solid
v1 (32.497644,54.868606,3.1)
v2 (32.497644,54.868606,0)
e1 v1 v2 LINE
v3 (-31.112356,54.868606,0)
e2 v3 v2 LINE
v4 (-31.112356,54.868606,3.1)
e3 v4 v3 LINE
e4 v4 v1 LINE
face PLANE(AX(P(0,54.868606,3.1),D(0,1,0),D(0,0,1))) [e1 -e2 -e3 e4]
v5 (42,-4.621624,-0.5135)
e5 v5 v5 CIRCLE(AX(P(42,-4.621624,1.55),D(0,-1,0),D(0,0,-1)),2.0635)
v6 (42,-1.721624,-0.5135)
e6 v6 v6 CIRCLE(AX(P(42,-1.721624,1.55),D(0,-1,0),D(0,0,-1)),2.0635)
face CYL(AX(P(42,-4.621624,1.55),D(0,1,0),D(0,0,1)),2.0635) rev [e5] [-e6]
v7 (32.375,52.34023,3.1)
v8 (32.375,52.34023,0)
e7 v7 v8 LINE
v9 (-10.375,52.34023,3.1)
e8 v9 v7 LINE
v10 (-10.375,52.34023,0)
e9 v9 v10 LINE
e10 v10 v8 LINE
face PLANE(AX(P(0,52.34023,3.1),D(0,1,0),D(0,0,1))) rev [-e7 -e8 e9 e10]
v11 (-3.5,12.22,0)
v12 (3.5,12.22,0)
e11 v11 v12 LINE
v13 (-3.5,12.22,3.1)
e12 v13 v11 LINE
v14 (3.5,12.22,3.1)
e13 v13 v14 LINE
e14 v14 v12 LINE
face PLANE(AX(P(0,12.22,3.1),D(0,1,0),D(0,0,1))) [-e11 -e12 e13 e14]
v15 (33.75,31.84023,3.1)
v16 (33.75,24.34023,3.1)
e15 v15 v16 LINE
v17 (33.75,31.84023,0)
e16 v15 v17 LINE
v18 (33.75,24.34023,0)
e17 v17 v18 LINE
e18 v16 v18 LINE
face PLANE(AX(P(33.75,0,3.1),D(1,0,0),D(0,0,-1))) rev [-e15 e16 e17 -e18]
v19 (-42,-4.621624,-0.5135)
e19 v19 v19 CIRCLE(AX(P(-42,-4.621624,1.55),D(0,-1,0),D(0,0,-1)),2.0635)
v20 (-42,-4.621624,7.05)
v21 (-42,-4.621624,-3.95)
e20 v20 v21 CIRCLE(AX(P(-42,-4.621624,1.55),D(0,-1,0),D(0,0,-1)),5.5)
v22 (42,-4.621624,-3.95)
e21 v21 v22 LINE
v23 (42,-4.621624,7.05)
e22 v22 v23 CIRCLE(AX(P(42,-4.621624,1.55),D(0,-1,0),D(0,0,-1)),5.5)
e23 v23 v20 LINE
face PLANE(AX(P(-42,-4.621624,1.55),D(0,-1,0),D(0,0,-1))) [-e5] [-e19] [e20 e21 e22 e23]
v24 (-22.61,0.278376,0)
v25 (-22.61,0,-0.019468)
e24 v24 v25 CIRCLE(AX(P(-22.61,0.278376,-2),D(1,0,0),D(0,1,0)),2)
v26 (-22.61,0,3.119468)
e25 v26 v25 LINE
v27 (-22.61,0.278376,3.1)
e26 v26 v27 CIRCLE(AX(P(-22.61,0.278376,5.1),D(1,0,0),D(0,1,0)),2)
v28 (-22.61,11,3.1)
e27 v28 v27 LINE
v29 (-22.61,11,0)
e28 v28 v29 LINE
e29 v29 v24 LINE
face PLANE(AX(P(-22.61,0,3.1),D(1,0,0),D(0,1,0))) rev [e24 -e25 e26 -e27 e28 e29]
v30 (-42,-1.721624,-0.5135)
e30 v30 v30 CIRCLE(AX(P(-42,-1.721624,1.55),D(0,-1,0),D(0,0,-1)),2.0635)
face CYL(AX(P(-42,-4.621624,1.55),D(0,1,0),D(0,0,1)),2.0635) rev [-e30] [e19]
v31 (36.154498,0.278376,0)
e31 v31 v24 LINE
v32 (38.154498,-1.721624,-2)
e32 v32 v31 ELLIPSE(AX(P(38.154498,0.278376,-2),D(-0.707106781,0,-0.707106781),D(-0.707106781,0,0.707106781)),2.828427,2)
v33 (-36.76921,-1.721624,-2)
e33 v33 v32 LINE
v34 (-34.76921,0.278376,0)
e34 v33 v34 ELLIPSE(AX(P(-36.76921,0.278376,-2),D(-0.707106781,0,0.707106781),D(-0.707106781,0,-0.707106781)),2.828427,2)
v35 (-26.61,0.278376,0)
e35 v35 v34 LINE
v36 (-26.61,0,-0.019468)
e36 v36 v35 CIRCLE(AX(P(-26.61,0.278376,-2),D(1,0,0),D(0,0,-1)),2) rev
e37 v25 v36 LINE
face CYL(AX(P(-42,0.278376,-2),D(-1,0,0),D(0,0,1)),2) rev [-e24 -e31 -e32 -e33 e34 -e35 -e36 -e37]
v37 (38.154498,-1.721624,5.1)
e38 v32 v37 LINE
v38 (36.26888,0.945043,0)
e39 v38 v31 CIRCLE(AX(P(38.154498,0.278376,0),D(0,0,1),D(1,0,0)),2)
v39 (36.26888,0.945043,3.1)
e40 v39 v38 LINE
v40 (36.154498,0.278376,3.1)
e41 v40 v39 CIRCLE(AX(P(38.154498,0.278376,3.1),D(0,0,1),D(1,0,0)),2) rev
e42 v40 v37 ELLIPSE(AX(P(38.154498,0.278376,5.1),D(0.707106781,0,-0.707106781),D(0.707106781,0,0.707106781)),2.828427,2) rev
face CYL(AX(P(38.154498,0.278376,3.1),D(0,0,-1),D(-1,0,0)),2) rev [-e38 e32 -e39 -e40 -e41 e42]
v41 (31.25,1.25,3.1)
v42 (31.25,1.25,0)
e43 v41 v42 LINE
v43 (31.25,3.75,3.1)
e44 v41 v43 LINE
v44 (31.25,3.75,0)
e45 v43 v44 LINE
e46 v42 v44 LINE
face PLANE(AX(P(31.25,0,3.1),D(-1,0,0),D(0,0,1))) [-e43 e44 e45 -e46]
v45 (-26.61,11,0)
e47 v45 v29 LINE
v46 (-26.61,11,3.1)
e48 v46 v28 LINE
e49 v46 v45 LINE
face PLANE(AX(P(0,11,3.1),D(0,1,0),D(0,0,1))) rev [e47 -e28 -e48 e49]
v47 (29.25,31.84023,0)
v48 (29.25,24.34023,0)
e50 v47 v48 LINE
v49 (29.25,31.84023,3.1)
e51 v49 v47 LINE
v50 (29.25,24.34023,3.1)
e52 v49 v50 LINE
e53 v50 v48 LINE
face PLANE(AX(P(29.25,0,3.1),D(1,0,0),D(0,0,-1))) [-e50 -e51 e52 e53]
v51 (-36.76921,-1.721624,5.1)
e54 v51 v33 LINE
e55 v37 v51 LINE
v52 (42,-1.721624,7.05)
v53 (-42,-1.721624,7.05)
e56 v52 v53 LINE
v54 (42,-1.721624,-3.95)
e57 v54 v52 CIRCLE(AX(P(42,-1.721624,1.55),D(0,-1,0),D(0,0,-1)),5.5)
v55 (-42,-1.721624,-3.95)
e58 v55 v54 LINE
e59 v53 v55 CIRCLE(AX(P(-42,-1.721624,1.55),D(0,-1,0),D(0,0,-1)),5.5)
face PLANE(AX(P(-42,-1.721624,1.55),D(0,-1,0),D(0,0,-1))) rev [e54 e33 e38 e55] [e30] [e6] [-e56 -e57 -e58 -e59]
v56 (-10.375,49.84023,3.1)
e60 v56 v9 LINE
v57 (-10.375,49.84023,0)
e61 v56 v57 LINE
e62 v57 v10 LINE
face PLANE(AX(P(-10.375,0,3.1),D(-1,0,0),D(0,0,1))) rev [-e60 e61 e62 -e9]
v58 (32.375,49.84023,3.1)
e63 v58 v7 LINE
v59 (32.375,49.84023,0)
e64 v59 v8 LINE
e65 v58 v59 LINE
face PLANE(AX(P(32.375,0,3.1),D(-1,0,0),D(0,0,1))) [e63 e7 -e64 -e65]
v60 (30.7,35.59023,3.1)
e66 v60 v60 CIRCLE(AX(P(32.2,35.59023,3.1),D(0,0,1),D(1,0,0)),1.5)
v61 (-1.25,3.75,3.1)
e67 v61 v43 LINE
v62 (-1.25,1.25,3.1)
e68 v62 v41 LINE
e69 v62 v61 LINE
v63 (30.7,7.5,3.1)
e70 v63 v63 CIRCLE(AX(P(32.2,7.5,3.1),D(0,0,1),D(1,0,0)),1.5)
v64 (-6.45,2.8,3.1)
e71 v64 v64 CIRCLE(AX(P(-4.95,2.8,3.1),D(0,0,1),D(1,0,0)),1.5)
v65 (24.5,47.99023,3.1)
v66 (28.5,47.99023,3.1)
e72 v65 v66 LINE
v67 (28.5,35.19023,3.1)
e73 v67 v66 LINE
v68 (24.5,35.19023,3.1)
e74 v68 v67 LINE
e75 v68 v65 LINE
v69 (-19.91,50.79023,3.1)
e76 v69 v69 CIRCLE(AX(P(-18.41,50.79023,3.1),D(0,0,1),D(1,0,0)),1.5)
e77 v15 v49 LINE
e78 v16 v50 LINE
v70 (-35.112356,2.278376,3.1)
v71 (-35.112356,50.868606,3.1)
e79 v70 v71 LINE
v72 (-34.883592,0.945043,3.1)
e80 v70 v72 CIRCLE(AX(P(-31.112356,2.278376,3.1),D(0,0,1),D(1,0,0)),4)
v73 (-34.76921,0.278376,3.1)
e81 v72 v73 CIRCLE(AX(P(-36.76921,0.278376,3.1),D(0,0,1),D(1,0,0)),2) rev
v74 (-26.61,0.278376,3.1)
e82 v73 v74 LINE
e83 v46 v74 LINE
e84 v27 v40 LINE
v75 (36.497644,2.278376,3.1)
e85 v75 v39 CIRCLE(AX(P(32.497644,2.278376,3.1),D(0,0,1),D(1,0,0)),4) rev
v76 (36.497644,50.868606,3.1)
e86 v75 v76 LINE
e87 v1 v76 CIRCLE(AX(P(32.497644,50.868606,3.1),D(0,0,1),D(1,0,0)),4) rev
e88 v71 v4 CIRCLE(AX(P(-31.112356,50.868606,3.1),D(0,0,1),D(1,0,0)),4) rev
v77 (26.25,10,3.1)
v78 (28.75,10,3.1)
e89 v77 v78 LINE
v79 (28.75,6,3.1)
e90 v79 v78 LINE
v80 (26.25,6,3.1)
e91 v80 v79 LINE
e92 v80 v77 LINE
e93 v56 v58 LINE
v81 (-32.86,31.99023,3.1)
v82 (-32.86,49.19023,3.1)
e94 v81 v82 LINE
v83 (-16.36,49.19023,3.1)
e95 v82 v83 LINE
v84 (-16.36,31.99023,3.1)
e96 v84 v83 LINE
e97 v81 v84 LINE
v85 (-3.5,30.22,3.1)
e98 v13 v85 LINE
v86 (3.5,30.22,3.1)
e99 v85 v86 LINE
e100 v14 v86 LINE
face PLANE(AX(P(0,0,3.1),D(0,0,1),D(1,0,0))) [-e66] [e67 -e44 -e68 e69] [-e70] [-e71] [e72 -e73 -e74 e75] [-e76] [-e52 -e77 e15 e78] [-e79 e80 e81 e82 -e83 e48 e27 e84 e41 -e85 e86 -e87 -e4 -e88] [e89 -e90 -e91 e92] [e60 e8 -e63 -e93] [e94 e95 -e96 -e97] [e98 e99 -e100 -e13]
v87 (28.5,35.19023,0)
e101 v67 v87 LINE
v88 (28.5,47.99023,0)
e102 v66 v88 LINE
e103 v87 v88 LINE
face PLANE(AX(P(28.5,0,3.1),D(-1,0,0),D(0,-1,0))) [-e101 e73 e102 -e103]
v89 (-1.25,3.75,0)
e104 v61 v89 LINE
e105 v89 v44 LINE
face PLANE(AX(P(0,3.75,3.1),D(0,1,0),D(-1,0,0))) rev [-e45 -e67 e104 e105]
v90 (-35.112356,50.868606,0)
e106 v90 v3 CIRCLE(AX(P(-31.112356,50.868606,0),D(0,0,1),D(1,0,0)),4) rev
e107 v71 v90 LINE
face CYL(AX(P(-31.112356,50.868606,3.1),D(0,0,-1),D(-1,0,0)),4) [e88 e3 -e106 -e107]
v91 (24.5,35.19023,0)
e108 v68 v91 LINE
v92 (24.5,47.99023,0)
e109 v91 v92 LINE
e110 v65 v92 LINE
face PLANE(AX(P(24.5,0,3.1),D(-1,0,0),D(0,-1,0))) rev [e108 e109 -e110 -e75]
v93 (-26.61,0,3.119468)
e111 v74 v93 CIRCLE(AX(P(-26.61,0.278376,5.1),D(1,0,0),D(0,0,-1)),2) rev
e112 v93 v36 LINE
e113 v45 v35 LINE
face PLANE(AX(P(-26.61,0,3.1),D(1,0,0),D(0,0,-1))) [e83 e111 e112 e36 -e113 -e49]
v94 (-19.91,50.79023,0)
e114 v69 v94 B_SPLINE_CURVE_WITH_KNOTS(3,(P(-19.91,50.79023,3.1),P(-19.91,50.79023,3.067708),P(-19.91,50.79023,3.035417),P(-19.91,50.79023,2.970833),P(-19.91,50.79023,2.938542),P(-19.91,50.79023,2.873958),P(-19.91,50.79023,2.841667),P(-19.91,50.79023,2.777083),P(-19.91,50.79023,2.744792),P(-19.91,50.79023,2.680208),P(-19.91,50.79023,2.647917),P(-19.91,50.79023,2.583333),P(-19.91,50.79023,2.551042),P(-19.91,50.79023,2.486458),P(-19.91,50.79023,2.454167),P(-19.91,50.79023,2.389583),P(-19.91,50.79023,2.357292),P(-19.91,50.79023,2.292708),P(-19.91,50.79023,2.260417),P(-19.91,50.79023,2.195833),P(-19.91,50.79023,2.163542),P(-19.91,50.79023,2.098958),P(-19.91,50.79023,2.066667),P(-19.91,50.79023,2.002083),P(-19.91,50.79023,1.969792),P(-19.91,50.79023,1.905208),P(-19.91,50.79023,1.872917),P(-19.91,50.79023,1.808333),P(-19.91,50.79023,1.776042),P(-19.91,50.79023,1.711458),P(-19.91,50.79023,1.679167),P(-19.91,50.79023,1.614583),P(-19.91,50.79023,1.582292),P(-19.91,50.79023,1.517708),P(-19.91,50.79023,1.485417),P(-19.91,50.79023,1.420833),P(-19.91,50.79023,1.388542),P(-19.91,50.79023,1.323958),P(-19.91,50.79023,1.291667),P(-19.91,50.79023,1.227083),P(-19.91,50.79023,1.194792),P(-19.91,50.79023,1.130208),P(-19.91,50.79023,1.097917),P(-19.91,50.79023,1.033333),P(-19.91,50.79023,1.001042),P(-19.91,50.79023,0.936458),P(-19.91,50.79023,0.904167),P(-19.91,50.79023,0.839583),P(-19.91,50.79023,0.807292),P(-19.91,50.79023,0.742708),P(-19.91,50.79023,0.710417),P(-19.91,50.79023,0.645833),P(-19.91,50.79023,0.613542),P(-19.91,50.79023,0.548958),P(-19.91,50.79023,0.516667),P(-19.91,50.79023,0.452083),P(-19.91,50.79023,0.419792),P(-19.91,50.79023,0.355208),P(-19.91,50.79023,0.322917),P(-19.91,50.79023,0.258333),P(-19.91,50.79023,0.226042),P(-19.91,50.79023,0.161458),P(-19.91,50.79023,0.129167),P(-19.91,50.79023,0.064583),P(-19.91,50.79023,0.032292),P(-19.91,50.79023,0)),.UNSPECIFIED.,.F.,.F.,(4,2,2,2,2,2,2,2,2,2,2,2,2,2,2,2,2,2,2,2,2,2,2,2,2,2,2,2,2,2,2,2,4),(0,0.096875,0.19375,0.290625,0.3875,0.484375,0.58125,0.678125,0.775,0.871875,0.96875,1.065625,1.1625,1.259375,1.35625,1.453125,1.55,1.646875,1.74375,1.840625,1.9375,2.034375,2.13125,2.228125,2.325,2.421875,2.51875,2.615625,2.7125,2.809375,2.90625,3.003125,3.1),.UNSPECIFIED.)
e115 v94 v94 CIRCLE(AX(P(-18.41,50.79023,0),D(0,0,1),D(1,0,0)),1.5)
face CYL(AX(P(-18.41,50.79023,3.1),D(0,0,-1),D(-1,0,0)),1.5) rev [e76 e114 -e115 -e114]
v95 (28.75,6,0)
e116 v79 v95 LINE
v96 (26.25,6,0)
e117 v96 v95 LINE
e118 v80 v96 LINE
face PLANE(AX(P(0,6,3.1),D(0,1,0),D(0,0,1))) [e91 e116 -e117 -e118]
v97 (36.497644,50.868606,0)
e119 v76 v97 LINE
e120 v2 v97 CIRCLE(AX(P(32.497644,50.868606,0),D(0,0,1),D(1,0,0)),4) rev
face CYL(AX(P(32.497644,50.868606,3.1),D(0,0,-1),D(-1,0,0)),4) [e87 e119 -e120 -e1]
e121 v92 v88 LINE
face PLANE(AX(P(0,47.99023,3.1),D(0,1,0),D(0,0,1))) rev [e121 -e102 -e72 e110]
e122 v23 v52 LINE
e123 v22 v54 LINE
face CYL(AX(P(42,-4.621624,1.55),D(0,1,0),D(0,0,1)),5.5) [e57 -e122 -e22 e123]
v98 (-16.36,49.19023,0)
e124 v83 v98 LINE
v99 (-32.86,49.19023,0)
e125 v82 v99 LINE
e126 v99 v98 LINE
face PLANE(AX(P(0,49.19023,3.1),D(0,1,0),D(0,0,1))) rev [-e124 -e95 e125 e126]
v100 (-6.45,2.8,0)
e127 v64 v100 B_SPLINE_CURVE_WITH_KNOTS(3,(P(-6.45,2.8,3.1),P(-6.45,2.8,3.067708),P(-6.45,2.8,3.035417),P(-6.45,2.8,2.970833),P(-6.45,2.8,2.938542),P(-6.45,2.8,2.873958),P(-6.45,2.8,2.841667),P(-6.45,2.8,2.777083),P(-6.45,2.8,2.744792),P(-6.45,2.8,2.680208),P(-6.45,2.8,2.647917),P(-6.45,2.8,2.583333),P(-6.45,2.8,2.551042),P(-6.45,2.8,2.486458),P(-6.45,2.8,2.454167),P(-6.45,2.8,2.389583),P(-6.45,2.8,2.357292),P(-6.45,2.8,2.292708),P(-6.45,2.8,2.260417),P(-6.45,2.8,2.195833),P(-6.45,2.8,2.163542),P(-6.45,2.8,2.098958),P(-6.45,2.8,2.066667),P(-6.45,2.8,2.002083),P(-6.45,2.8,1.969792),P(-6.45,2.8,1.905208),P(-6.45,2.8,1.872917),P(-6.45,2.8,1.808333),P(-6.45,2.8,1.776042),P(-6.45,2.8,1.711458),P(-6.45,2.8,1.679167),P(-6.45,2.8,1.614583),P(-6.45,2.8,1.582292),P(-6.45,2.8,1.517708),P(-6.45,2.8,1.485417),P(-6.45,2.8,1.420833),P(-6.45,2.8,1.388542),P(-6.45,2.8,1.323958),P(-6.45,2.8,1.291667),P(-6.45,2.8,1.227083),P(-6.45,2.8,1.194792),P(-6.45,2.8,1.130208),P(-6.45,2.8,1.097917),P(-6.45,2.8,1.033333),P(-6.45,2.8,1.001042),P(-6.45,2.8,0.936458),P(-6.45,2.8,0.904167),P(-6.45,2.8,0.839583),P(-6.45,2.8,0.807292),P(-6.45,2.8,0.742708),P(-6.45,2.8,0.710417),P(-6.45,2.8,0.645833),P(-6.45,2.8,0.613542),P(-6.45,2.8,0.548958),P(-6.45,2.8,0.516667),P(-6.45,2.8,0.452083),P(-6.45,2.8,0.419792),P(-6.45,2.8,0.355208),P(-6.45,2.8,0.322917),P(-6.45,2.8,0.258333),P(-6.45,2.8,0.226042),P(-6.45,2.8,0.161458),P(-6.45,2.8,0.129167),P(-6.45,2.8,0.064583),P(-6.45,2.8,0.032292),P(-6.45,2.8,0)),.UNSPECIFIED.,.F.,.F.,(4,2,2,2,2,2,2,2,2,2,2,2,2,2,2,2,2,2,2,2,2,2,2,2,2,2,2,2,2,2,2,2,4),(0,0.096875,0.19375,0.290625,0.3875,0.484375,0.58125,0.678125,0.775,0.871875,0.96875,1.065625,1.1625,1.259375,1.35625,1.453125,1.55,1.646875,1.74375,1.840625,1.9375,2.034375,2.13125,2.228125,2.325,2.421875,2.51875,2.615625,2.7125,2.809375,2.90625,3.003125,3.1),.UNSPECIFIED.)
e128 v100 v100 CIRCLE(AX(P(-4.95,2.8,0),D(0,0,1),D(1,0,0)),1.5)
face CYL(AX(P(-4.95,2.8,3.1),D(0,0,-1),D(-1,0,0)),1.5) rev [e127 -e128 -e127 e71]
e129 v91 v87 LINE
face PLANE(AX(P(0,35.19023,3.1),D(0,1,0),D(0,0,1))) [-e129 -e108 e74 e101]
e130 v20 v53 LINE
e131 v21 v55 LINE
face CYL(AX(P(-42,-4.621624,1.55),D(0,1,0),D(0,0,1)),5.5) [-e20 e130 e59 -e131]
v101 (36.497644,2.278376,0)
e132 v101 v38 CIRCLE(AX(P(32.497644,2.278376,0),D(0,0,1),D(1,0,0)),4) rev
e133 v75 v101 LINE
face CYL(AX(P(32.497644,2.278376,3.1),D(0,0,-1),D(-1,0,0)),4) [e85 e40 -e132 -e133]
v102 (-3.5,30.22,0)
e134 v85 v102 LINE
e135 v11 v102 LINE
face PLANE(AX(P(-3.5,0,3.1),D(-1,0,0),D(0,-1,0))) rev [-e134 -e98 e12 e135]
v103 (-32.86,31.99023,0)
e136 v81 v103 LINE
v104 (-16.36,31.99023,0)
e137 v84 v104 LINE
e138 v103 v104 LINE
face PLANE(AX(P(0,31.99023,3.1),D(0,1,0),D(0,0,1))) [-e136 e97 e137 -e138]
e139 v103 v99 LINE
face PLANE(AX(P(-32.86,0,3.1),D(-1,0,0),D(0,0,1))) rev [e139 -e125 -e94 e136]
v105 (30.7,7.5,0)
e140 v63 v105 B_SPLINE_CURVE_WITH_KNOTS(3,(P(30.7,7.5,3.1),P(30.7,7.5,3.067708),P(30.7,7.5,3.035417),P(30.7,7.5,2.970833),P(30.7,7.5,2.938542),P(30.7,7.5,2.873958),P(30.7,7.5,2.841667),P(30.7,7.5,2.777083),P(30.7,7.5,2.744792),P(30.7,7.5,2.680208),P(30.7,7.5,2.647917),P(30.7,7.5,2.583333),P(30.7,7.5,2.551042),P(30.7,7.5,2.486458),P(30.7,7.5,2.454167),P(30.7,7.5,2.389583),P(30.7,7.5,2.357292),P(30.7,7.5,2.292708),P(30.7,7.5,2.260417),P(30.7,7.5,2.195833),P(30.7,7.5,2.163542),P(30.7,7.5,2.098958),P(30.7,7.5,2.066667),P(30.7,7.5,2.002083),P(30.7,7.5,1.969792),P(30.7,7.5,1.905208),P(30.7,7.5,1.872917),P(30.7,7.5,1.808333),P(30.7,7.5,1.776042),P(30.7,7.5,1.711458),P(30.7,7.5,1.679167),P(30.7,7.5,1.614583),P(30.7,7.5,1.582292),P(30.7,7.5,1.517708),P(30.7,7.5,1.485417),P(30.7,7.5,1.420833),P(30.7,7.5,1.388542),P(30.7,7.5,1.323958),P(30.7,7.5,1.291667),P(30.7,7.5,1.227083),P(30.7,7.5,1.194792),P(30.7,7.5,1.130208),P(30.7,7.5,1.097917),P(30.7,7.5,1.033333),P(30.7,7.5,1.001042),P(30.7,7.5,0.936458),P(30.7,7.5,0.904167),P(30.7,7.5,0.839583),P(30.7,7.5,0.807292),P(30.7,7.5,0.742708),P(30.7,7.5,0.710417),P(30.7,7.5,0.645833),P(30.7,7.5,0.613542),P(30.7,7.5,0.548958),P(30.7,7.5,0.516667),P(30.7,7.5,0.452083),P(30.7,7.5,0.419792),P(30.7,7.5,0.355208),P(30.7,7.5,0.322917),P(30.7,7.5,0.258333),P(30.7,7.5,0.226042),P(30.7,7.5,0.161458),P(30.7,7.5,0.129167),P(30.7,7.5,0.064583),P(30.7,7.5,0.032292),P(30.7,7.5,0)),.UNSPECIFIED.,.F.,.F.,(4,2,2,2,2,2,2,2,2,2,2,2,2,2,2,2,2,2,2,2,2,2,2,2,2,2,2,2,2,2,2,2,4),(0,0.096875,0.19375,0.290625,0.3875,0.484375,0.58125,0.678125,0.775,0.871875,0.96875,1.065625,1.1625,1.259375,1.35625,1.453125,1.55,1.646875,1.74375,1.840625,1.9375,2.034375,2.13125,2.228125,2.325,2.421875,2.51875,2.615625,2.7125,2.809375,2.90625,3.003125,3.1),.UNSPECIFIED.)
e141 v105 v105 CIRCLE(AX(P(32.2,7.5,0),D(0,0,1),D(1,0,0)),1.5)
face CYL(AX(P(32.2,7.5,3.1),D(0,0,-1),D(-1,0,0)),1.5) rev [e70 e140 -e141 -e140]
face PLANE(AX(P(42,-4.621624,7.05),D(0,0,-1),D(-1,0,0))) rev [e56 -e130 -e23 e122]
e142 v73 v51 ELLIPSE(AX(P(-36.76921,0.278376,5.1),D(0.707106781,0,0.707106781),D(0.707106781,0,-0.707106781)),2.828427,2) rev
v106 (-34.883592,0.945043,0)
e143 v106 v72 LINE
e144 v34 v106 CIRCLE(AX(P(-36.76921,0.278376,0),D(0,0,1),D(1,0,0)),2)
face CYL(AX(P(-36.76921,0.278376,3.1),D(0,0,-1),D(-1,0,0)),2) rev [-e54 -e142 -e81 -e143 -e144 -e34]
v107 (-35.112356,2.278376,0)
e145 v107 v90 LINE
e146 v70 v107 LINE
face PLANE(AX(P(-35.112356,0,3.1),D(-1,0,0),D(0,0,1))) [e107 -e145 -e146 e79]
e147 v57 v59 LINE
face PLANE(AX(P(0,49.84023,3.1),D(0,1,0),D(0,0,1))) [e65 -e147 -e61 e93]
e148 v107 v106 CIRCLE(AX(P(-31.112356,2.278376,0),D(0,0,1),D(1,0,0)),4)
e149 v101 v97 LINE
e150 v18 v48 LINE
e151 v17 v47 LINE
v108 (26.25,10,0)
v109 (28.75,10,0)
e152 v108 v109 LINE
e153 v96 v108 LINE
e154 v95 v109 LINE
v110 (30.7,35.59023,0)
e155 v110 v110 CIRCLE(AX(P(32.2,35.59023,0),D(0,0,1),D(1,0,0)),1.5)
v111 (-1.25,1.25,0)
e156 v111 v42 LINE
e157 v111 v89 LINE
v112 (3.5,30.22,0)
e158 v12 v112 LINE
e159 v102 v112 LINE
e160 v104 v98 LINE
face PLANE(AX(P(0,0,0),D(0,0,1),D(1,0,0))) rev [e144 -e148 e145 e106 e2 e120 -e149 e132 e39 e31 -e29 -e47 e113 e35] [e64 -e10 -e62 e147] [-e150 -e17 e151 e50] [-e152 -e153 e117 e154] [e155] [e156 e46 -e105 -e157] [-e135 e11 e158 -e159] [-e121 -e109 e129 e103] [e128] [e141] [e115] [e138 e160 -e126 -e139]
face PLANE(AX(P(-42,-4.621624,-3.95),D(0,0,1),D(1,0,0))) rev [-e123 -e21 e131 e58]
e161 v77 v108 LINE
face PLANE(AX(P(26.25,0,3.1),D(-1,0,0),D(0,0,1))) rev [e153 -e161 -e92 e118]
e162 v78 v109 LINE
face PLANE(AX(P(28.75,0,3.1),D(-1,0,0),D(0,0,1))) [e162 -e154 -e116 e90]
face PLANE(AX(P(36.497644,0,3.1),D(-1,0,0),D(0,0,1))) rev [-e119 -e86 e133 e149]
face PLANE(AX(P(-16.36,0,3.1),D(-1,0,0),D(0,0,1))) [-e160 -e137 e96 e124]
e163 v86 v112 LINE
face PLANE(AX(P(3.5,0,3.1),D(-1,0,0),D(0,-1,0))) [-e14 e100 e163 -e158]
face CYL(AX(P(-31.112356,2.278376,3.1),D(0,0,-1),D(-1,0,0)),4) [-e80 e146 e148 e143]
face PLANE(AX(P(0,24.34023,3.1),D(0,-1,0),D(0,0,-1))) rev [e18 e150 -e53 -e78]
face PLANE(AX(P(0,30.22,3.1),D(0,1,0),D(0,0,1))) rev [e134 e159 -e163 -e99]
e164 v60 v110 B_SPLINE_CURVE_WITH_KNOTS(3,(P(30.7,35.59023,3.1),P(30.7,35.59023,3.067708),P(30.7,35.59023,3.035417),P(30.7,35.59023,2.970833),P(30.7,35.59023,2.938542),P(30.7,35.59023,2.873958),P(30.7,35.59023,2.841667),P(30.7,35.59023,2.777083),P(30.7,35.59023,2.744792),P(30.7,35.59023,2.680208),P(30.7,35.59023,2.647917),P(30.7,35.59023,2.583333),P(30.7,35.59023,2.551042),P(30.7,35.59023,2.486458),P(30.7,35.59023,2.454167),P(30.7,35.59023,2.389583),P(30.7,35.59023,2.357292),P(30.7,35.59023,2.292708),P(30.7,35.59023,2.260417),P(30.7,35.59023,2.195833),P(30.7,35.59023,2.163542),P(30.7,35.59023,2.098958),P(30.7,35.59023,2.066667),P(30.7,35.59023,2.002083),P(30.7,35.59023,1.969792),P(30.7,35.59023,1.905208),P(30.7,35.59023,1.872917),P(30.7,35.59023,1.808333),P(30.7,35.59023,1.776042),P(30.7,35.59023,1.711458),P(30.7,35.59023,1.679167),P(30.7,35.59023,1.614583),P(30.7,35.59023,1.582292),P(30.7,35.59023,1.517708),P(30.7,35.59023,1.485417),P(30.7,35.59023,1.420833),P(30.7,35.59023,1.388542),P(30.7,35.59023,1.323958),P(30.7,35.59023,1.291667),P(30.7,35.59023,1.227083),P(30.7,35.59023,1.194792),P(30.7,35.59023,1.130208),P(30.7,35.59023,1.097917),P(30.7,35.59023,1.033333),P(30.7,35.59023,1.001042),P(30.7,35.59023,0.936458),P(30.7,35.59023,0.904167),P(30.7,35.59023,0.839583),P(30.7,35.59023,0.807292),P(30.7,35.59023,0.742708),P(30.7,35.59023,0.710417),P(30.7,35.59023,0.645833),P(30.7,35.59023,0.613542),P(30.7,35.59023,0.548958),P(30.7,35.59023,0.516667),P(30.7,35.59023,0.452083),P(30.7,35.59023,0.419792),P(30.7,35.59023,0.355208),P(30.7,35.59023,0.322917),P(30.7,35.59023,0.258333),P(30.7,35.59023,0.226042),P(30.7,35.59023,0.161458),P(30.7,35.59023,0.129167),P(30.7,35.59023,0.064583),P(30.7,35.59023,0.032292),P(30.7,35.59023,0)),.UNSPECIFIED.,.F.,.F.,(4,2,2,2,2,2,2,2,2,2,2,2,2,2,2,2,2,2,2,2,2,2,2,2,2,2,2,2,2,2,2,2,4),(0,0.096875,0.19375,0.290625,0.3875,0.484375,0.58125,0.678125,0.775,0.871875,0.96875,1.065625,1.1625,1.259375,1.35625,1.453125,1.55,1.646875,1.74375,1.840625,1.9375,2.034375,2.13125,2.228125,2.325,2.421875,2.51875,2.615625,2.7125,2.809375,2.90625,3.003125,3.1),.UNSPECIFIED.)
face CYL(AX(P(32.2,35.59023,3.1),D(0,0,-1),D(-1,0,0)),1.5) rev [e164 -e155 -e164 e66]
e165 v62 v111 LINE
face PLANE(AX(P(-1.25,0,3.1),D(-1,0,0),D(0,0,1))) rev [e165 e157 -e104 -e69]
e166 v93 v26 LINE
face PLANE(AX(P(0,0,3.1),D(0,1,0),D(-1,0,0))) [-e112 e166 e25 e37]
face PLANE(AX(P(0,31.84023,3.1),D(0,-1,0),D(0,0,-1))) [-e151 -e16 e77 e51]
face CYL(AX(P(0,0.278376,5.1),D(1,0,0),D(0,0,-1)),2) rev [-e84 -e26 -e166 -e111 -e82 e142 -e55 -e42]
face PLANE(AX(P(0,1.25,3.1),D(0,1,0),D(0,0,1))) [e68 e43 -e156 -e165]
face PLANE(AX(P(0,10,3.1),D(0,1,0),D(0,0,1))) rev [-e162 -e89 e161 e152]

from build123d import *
from build123d.topology import SkipClean

# Parameters (mm, degrees)
SKETCH1_R           = 1.5
SKETCH1_W           = 16.5
SKETCH1_H           = 17.2
SKETCH1_W_2         = 7
SKETCH1_H_2         = 18
SKETCH1_W_3         = 42.75
SKETCH1_H_3         = 2.5
SKETCH1_W_4         = 4
SKETCH1_H_4         = 12.8
SKETCH1_W_5         = 4.5
SKETCH1_H_5         = 7.5
SKETCH1_W_6         = 2.5
SKETCH1_H_6         = 4
SKETCH1_W_7         = 32.5
SKETCH1_H_7         = 11
BOSS_EXTRUDE1_DEPTH = 3.1
SKETCH2_R           = 2.0635
BOSS_EXTRUDE2_DEPTH = 2.9
FILLET1_DEPTH       = 3.1
FILLET1_START       = -36.769210249
FILLET1_2_DEPTH     = 74.923708499
FILLET1_START_2     = -22.61
FILLET1_3_DEPTH     = 60.0761
FILLET1_START_3     = -36.399689195
FILLET1_4_DEPTH     = 9.789689195
FILLET1_START_4     = -2
FILLET1_5_DEPTH     = 7.1


with BuildPart() as part:
    # Sketch1 → Boss-Extrude1 (new body)
    with BuildSketch(Plane.XY):
        with BuildLine():
            Line((-35.112356, 2.278375887), (-35.112356, 50.868606365))
            ThreePointArc((-35.112356, 50.868606365), (-33.940783125, 53.697033489), (-31.112356, 54.868606365))
            Line((-31.112356, 54.868606365), (32.497644, 54.868606365))
            ThreePointArc((32.497644, 54.868606365), (35.326071125, 53.697033489), (36.497644, 50.868606365))
            Line((36.497644, 50.868606365), (36.497644, 2.278375887))
            ThreePointArc((36.497644, 2.278375887), (35.326071125, -0.550051237), (32.497644, -1.721624113))
            Line((32.497644, -1.721624113), (-31.112356, -1.721624113))
            ThreePointArc((-31.112356, -1.721624113), (-33.940783125, -0.550051237), (-35.112356, 2.278375887))
        make_face()
        with Locations(Location((-18.41, 50.790230477, 0), (0, 0, 180))):
            Circle(SKETCH1_R, mode=Mode.SUBTRACT)
        with Locations(Location((-4.95, 2.8, 0), (0, 0, 180))):
            Circle(SKETCH1_R, mode=Mode.SUBTRACT)
        with Locations(Location((32.2, 7.5, 0), (0, 0, 180))):
            Circle(SKETCH1_R, mode=Mode.SUBTRACT)
        with Locations(Location((32.2, 35.590230477, 0), (0, 0, 180))):
            Circle(SKETCH1_R, mode=Mode.SUBTRACT)
        with Locations((-24.61, 40.590230477)):
            Rectangle(SKETCH1_W, SKETCH1_H, mode=Mode.SUBTRACT)
        with Locations((0, 21.22)):
            Rectangle(SKETCH1_W_2, SKETCH1_H_2, mode=Mode.SUBTRACT)
        with Locations((11, 51.090230477)):
            Rectangle(SKETCH1_W_3, SKETCH1_H_3, mode=Mode.SUBTRACT)
        with Locations((26.5, 41.590230477)):
            Rectangle(SKETCH1_W_4, SKETCH1_H_4, mode=Mode.SUBTRACT)
        with Locations((31.5, 28.090230477)):
            Rectangle(SKETCH1_W_5, SKETCH1_H_5, mode=Mode.SUBTRACT)
        with Locations((27.5, 8)):
            Rectangle(SKETCH1_W_6, SKETCH1_H_6, mode=Mode.SUBTRACT)
        with Locations((15, 2.5)):
            Rectangle(SKETCH1_W_7, SKETCH1_H_3, mode=Mode.SUBTRACT)
        with Locations((-24.61, 5.5)):
            Rectangle(SKETCH1_W_4, SKETCH1_H_7, mode=Mode.SUBTRACT)
    extrude(amount=BOSS_EXTRUDE1_DEPTH)

    # Sketch2 → Boss-Extrude2 (add)
    with BuildSketch(Plane(origin=(0, -1.721624113, 0), x_dir=(-1, 0, 0), z_dir=(0, -1, 0))):
        with BuildLine():
            Line((42, 3.95), (-42, 3.95))
            ThreePointArc((-42, 3.95), (-47.5, -1.55), (-42, -7.05))
            Line((-42, -7.05), (42, -7.05))
            ThreePointArc((42, -7.05), (47.5, -1.55), (42, 3.95))
        make_face()
        with Locations(Location((-42, -1.55, 0), (0, 0, 90))):
            Circle(SKETCH2_R, mode=Mode.SUBTRACT)
        with Locations(Location((42, -1.55, 0), (0, 0, 90))):
            Circle(SKETCH2_R, mode=Mode.SUBTRACT)
    extrude(amount=BOSS_EXTRUDE2_DEPTH)

    # Fillet1: read off the stored shape, not the designer's step
    # Fillet1 outline → Fillet1 (add)
    with BuildSketch(Plane.XY):
        with BuildLine():
            ThreePointArc((-31.112356, -1.721624113), (-33.421757077, -0.987610436), (-34.883592166, 0.945042554))
            ThreePointArc((-34.883592166, 0.945042554), (-35.136217087, -0.876324651), (-36.769210249, -1.721624113))
            Line((-36.769210249, -1.721624113), (-31.112356, -1.721624113))
        make_face()
        with BuildLine():
            ThreePointArc((36.268880166, 0.945042554), (34.807045077, -0.987610436), (32.497644, -1.721624113))
            Line((32.497644, -1.721624113), (38.15449825, -1.721624113))
            ThreePointArc((38.15449825, -1.721624113), (36.521505088, -0.876324651), (36.268880166, 0.945042554))
        make_face()
    extrude(amount=FILLET1_DEPTH)

    # Fillet1 2 outline → Fillet1 2 (add)
    with BuildSketch(Plane.YZ.offset(FILLET1_START)):
        with BuildLine():
            ThreePointArc((0, 3.119468035), (-1.231053106, 3.787893254), (-1.721624113, 5.1))
            Line((-1.721624113, 5.1), (-1.721624113, 3.1))
            Line((-1.721624113, 3.1), (0, 3.1))
            Line((0, 3.1), (0, 3.119468035))
        make_face()
        with BuildLine():
            Line((0, 0), (-1.721624113, 0))
            Line((-1.721624113, 0), (-1.721624113, -2))
            ThreePointArc((-1.721624113, -2), (-1.231053106, -0.687893254), (0, -0.019468035))
            Line((0, -0.019468035), (0, 0))
        make_face()
    extrude(amount=FILLET1_2_DEPTH)

    # Fillet1 3 outline → Fillet1 3 (add)
    with BuildSketch(Plane.YZ.offset(FILLET1_START_2)):
        with BuildLine():
            ThreePointArc((0.278375887, 3.1), (0.138847988, 3.104872945), (0, 3.119468035))
            Line((0, 3.119468035), (0, 3.1))
            Line((0, 3.1), (0.278375887, 3.1))
        make_face()
        with BuildLine():
            Line((0.278375887, 0), (0, 0))
            Line((0, 0), (0, -0.019468035))
            ThreePointArc((0, -0.019468035), (0.138847988, -0.004872945), (0.278375887, 0))
        make_face()
    extrude(amount=FILLET1_3_DEPTH)

    # Fillet1 4 outline → Fillet1 4 (add)
    with BuildSketch(Plane.YZ.offset(FILLET1_START_3)):
        with BuildLine():
            ThreePointArc((0.278375887, 3.1), (0.138847988, 3.104872945), (0, 3.119468035))
            Line((0, 3.119468035), (0, 3.1))
            Line((0, 3.1), (0.278375887, 3.1))
        make_face()
        with BuildLine():
            Line((0.278375887, 0), (0, 0))
            Line((0, 0), (0, -0.019468035))
            ThreePointArc((0, -0.019468035), (0.138847988, -0.004872945), (0.278375887, 0))
        make_face()
    extrude(amount=FILLET1_4_DEPTH)

    # Fillet1 5 outline → Fillet1 5 (cut)
    with SkipClean():  # the faces are left unmerged after this step: merging them gives an invalid solid
        with BuildSketch(Plane.XY.offset(FILLET1_START_4)):
            with BuildLine():
                Line((-36.399689195, 0.278375887), (-36.399689195, 0))
                Line((-36.399689195, 0), (-36.769210249, 0))
                Line((-36.769210249, 0), (-36.769210249, -1.721624113))
                ThreePointArc((-36.769210249, -1.721624113), (-35.354996687, -1.135837675), (-34.769210249, 0.278375887))
                Line((-34.769210249, 0.278375887), (-36.399689195, 0.278375887))
            make_face()
            with BuildLine():
                Line((38.15449825, -1.721624113), (38.15449825, 0))
                Line((38.15449825, 0), (37.4661, 0))
                Line((37.4661, 0), (37.4661, 0.278375887))
                Line((37.4661, 0.278375887), (36.15449825, 0.278375887))
                ThreePointArc((36.15449825, 0.278375887), (36.740284688, -1.135837675), (38.15449825, -1.721624113))
            make_face()
        extrude(amount=FILLET1_5_DEPTH, mode=Mode.SUBTRACT)


solid = part.part
